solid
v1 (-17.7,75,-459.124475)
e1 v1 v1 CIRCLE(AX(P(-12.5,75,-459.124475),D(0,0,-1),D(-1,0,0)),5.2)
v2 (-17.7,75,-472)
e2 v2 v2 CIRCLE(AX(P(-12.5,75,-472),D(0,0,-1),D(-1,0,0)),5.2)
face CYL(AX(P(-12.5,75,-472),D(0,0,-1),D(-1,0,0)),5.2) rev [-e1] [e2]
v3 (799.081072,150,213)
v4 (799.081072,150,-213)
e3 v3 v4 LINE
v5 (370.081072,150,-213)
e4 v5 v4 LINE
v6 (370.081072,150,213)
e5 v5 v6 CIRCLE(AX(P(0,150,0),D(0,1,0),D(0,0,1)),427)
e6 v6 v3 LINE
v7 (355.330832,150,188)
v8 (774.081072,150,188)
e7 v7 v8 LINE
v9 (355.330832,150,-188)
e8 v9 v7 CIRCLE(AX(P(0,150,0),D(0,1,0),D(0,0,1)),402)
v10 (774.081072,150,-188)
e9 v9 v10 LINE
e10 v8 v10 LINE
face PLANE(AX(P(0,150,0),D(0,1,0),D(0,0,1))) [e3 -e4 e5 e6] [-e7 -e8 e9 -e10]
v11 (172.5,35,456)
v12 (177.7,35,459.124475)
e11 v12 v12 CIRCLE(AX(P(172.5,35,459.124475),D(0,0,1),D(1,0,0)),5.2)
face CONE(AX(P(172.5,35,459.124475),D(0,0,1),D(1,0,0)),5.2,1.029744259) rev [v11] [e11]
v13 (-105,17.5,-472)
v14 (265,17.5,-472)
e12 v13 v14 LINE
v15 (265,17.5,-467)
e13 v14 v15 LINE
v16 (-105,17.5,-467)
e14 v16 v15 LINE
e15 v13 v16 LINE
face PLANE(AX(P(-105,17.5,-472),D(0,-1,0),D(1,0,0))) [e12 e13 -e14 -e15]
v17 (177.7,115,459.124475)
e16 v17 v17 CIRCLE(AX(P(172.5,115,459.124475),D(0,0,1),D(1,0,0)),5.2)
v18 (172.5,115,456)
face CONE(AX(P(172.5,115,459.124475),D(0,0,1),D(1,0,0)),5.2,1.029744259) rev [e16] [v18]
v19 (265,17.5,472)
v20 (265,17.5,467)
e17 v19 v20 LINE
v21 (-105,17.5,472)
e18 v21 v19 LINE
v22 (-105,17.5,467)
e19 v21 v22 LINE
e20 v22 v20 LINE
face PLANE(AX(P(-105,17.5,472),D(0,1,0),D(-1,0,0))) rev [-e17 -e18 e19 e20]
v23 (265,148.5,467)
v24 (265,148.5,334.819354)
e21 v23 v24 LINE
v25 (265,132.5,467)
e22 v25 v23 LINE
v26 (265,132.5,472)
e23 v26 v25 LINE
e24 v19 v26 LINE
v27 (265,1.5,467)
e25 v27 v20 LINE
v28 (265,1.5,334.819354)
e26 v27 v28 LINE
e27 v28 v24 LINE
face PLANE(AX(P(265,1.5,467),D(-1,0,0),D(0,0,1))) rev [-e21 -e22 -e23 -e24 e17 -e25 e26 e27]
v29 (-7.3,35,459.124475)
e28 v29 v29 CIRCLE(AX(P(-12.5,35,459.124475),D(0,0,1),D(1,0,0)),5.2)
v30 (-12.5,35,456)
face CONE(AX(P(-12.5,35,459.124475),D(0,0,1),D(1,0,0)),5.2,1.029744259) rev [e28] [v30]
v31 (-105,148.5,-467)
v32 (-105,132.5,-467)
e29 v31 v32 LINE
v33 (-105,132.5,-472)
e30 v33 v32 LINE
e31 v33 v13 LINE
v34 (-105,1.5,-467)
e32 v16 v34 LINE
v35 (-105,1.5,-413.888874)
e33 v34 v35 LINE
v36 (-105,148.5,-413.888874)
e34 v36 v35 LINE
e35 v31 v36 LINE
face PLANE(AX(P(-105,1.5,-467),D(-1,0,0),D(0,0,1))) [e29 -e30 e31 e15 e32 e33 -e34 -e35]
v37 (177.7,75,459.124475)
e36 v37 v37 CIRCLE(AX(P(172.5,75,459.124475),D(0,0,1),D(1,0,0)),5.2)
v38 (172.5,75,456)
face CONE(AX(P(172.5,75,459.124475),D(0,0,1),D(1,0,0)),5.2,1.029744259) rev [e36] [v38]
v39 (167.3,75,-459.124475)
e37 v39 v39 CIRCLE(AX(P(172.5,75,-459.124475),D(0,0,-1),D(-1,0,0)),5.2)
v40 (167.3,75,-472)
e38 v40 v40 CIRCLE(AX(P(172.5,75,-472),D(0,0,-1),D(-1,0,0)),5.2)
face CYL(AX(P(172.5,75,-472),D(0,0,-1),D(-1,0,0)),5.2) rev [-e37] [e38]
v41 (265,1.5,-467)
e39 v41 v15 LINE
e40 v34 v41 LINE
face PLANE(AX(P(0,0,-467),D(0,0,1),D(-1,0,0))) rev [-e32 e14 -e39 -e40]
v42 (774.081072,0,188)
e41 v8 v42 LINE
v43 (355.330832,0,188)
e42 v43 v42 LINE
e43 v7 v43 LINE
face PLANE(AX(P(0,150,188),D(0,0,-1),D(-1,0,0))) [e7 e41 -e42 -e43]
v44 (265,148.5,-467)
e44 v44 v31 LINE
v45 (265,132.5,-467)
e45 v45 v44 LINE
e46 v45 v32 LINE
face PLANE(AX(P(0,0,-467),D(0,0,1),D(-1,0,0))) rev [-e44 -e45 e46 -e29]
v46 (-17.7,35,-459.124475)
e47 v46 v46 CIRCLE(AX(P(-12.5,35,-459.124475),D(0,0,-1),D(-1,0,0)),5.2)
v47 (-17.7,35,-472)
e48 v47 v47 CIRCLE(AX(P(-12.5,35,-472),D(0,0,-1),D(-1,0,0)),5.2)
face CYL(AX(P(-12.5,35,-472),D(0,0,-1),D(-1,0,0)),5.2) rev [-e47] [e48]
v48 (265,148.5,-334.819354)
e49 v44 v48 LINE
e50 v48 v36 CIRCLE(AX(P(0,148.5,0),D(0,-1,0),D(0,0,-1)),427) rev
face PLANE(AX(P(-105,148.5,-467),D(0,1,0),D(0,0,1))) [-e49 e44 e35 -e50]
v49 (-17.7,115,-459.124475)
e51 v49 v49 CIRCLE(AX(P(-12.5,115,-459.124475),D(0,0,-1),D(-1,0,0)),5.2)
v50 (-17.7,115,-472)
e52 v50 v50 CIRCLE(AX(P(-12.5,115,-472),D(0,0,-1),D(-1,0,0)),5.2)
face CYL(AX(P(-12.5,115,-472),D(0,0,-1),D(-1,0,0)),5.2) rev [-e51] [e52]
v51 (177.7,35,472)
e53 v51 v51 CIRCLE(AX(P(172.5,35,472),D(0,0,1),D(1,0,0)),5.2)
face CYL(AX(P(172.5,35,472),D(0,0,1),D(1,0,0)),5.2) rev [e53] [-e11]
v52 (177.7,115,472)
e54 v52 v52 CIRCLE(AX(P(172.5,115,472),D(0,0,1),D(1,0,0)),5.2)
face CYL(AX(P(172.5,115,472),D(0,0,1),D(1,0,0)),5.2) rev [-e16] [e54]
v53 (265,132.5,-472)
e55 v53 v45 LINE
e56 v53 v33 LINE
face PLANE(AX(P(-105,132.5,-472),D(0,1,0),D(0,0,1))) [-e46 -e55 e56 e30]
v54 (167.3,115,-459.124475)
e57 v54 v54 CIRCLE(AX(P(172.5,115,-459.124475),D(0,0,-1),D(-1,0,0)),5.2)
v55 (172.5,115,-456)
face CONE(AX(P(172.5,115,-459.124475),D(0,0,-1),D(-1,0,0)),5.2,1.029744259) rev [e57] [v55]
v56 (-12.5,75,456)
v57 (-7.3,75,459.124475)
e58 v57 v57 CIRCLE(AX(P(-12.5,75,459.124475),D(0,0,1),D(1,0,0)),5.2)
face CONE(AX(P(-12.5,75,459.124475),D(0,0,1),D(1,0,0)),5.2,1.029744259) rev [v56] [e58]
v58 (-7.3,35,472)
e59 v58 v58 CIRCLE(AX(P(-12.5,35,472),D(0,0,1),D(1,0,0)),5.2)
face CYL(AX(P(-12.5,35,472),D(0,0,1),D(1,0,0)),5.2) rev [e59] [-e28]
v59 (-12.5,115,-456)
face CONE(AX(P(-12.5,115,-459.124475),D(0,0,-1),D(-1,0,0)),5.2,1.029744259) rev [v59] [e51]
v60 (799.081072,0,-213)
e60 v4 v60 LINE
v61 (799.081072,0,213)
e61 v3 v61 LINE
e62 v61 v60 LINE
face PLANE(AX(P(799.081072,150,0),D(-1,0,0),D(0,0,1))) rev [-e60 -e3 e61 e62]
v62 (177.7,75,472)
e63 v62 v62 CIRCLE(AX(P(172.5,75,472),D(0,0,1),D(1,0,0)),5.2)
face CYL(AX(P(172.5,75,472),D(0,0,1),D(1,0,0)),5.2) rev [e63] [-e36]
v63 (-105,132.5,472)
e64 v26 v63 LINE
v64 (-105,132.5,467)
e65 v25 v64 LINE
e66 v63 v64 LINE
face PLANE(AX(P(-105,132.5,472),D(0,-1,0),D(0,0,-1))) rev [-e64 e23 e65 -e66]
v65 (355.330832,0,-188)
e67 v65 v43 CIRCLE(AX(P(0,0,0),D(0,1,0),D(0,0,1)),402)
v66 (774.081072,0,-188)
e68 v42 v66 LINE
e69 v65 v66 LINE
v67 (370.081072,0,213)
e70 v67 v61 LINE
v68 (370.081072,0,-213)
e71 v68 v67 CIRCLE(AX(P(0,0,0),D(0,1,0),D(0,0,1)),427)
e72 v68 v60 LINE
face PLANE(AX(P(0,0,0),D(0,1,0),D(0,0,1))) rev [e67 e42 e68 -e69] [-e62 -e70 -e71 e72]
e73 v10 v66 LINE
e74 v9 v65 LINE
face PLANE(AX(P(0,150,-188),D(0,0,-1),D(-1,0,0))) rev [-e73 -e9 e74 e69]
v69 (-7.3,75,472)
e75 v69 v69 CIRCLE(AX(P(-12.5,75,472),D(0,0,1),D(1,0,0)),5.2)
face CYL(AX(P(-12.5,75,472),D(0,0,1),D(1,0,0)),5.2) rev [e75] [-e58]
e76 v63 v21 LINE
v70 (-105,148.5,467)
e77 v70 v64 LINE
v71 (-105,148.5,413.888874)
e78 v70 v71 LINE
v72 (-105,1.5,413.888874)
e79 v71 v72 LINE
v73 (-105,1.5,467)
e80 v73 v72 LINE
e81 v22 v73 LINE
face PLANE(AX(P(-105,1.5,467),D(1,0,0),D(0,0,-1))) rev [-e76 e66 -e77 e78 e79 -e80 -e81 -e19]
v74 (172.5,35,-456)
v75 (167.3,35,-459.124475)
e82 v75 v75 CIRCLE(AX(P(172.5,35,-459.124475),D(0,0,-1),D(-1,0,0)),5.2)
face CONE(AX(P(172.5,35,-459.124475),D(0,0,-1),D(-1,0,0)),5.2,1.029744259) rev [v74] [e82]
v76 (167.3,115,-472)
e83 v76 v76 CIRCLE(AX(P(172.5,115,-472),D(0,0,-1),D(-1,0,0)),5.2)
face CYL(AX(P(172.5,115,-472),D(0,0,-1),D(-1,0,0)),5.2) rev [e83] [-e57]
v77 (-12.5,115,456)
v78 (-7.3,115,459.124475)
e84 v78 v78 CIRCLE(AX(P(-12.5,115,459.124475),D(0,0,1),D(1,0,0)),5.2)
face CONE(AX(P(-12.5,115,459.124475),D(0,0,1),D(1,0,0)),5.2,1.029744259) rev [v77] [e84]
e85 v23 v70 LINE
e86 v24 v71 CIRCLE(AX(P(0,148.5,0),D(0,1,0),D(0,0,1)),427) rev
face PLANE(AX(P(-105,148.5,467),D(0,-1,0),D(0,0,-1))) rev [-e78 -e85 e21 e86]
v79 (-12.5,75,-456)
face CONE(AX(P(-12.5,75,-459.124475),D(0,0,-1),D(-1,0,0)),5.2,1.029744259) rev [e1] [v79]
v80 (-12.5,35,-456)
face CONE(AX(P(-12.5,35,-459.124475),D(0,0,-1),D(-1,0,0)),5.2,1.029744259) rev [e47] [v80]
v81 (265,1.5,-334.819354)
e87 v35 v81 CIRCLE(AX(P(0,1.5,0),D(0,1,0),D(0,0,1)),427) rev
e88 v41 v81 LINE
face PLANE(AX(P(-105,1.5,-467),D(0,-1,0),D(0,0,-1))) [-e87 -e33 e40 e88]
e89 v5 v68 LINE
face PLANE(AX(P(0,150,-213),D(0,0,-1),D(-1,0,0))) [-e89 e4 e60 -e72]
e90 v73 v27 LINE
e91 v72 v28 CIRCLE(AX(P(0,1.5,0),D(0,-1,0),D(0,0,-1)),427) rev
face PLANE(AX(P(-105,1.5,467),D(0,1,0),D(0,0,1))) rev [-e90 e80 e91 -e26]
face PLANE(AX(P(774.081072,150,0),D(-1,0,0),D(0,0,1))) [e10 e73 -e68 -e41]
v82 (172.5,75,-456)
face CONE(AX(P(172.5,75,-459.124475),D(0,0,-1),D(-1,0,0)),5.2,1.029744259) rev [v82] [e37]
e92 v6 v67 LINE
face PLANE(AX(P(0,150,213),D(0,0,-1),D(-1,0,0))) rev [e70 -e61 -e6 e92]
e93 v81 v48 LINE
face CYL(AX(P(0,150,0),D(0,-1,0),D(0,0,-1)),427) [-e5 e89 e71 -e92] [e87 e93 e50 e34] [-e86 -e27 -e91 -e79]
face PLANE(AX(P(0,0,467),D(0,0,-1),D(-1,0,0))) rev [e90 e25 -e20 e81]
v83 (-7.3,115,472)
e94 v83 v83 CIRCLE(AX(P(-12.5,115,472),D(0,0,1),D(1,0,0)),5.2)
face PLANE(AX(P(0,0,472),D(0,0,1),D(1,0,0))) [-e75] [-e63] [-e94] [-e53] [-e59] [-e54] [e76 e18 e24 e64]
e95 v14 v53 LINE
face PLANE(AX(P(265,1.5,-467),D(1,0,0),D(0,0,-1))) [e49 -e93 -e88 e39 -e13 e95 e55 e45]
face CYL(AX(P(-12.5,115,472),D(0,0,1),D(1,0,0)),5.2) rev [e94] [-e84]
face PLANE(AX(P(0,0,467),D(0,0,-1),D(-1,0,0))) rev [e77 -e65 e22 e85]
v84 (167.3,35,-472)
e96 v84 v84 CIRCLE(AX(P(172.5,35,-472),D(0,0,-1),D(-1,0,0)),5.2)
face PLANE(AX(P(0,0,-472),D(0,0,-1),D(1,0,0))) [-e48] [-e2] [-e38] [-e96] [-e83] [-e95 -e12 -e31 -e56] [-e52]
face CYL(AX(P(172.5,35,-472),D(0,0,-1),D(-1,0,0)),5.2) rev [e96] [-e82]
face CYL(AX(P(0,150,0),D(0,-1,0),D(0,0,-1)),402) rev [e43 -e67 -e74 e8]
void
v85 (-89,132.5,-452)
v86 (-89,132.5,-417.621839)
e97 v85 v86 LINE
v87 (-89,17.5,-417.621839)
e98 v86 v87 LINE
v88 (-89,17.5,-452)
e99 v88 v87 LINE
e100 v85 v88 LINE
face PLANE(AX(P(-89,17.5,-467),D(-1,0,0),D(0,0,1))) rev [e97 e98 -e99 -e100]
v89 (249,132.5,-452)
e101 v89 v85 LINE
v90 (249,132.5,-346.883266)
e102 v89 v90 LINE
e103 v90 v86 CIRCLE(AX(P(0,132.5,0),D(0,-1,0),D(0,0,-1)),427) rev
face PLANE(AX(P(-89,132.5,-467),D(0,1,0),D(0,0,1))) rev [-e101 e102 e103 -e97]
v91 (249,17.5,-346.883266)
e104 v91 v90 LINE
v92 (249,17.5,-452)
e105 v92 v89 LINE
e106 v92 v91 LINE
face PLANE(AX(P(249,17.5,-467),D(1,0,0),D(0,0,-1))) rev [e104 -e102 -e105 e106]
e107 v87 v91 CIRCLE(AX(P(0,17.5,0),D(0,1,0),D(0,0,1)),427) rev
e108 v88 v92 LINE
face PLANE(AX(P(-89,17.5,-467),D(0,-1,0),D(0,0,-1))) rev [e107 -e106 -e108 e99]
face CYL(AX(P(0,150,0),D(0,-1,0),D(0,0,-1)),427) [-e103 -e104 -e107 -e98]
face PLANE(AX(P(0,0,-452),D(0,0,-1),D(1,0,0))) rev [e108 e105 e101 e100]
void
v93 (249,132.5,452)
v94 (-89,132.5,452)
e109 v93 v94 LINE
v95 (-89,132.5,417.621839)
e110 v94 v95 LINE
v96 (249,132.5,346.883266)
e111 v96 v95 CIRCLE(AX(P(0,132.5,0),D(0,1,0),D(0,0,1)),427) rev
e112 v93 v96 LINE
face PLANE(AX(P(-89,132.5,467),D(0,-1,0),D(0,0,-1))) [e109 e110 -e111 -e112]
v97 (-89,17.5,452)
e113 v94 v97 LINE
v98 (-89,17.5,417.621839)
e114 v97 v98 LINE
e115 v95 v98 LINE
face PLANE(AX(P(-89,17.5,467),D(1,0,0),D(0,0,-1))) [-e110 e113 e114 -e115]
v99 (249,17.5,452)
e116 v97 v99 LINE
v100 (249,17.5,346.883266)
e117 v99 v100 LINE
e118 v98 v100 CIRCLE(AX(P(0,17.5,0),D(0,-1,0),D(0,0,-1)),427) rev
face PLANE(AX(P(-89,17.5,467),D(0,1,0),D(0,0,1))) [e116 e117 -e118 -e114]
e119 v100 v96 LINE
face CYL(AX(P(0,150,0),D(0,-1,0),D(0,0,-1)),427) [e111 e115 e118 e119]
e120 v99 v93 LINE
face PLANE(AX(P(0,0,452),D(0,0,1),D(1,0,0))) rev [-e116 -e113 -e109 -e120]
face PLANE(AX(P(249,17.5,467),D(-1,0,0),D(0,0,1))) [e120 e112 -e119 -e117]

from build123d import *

# Parameters (mm, degrees)
BOSS_EXTRUDE1_DEPTH               = 150
BOSS_EXTRUDE2_START               = 1.5
BOSS_EXTRUDE2_DEPTH               = 147
BOSS_EXTRUDE2_2_DEPTH             = 16
BOSS_EXTRUDE2_START_2             = 132.5
BOSS_EXTRUDE2_3_DEPTH             = 16
BOSS_EXTRUDE3_START               = -15
SKETCH3_W                         = 370
SKETCH3_H                         = 115
BOSS_EXTRUDE3_DEPTH               = 20
TAP_DRILL_FOR_M12_TAP1_AT_2_COUNT = 2
TAP_DRILL_FOR_M12_TAP1_AT_2_PITCH = 80
TAP_DRILL_FOR_M12_TAP1_AT_3_COUNT = 2
TAP_DRILL_FOR_M12_TAP1_AT_3_PITCH = 185
TAP_DRILL_FOR_M12_TAP1_AT_4_COUNT = 2
TAP_DRILL_FOR_M12_TAP1_AT_4_PITCH = 201.556443707
TAP_DRILL_FOR_M12_TAP1_AT_5_COUNT = 2
TAP_DRILL_FOR_M12_TAP1_AT_5_PITCH = 189.274932307
TAP_DRILL_FOR_M12_TAP1_AT_6_COUNT = 2
TAP_DRILL_FOR_M12_TAP1_AT_6_PITCH = 40


# Read off the part's stored shape, not the designer's step: Boss-Extrude2
with BuildPart() as part:
    # Sketch1 → Boss-Extrude1 (new body)
    with BuildSketch(Plane(origin=(0, 0, 0), x_dir=(1, 0, 0), z_dir=(0, 1, 0))):
        with BuildLine():
            Line((799.081072199, 213), (370.081072199, 213))
            ThreePointArc((370.081072199, 213), (-427, 0), (370.081072199, -213))
            Line((370.081072199, -213), (799.081072199, -213))
            Line((799.081072199, -213), (799.081072199, 213))
        make_face()
        with BuildLine():
            Line((355.330831761, 188), (774.081072199, 188))
            Line((774.081072199, 188), (774.081072199, -188))
            Line((774.081072199, -188), (355.330831761, -188))
            ThreePointArc((355.330831761, -188), (-402, 0), (355.330831761, 188))
        make_face(mode=Mode.SUBTRACT)
    extrude(amount=BOSS_EXTRUDE1_DEPTH)

    # Boss-Extrude2 outline → Boss-Extrude2 (add)
    with BuildSketch(Plane(origin=(0, 0, 0), x_dir=(1, 0, 0), z_dir=(0, 1, 0)).offset(BOSS_EXTRUDE2_START)):
        with BuildLine():
            Line((249, -467), (265, -467))
            Line((265, -467), (265, -334.819354279))
            ThreePointArc((265, -334.819354279), (257.070777199, -340.945179626), (249, -346.883265667))
            Line((249, -346.883265667), (249, -467))
        make_face()
        with BuildLine():
            Line((-105, -467), (-89, -467))
            Line((-89, -467), (-89, -417.621838509))
            ThreePointArc((-89, -417.621838509), (-97.017955844, -415.83231746), (-105, -413.888873975))
            Line((-105, -413.888873975), (-105, -467))
        make_face()
    boss_extrude2 = extrude(amount=BOSS_EXTRUDE2_DEPTH)

    # Boss-Extrude2 2 outline → Boss-Extrude2 2 (add)
    with BuildSketch(Plane(origin=(0, 0, 0), x_dir=(1, 0, 0), z_dir=(0, 1, 0)).offset(BOSS_EXTRUDE2_START)):
        with BuildLine():
            Line((-89, -467), (249, -467))
            Line((249, -467), (249, -346.883265667))
            ThreePointArc((249, -346.883265667), (87.46991724, -417.944988698), (-89, -417.621838509))
            Line((-89, -417.621838509), (-89, -467))
        make_face()
    boss_extrude2_2 = extrude(amount=BOSS_EXTRUDE2_2_DEPTH)

    # Boss-Extrude2 3 outline → Boss-Extrude2 3 (add)
    with BuildSketch(Plane(origin=(0, 0, 0), x_dir=(1, 0, 0), z_dir=(0, 1, 0)).offset(BOSS_EXTRUDE2_START_2)):
        with BuildLine():
            Line((-89, -467), (249, -467))
            Line((249, -467), (249, -346.883265667))
            ThreePointArc((249, -346.883265667), (87.46991724, -417.944988698), (-89, -417.621838509))
            Line((-89, -417.621838509), (-89, -467))
        make_face()
    boss_extrude2_3 = extrude(amount=BOSS_EXTRUDE2_3_DEPTH)

    # Sketch3 → Boss-Extrude3 (add)
    with BuildSketch(Plane.XY.offset(467).offset(BOSS_EXTRUDE3_START)):
        with Locations((80, 75)):
            Rectangle(SKETCH3_W, SKETCH3_H)
    boss_extrude3 = extrude(amount=BOSS_EXTRUDE3_DEPTH)

    # Sketch7 → Tap Drill for M12 Tap1 (revolve, cut)
    with BuildSketch(Plane(origin=(172.5, 115, 472), x_dir=(0, -1, 0), z_dir=(1, 0, 0))):
        Polygon((0, 0), (0, 16), (5.2, 12.875524781), (5.2, 0), align=None)
    tap_drill_for_m12_tap1 = revolve(axis=Axis((172.5, 115, 478.35), (0, 0, -1)), mode=Mode.SUBTRACT)

    # Tap Drill for M12 Tap1 at 2: Tap Drill for M12 Tap1 ×2
    with Locations(*[(0, -i * TAP_DRILL_FOR_M12_TAP1_AT_2_PITCH, 0) for i in range(1, TAP_DRILL_FOR_M12_TAP1_AT_2_COUNT)]):
        add(tap_drill_for_m12_tap1, mode=Mode.SUBTRACT)

    # Tap Drill for M12 Tap1 at 3: Tap Drill for M12 Tap1 ×2
    with Locations(*[(-i * TAP_DRILL_FOR_M12_TAP1_AT_3_PITCH, 0, 0) for i in range(1, TAP_DRILL_FOR_M12_TAP1_AT_3_COUNT)]):
        add(tap_drill_for_m12_tap1, mode=Mode.SUBTRACT)

    # Tap Drill for M12 Tap1 at 4: Tap Drill for M12 Tap1 ×2
    with Locations(*[Vector(-0.9178570359601427, -0.3969111506854671, 0) * (i * TAP_DRILL_FOR_M12_TAP1_AT_4_PITCH) for i in range(1, TAP_DRILL_FOR_M12_TAP1_AT_4_COUNT)]):
        add(tap_drill_for_m12_tap1, mode=Mode.SUBTRACT)

    # Tap Drill for M12 Tap1 at 5: Tap Drill for M12 Tap1 ×2
    with Locations(*[Vector(-0.9774141654398674, -0.21133279252753864, 0) * (i * TAP_DRILL_FOR_M12_TAP1_AT_5_PITCH) for i in range(1, TAP_DRILL_FOR_M12_TAP1_AT_5_COUNT)]):
        add(tap_drill_for_m12_tap1, mode=Mode.SUBTRACT)

    # Tap Drill for M12 Tap1 at 6: Tap Drill for M12 Tap1 ×2
    with Locations(*[(0, -i * TAP_DRILL_FOR_M12_TAP1_AT_6_PITCH, 0) for i in range(1, TAP_DRILL_FOR_M12_TAP1_AT_6_COUNT)]):
        add(tap_drill_for_m12_tap1, mode=Mode.SUBTRACT)

    # Mirror1: Boss-Extrude2, Boss-Extrude2 2, Boss-Extrude2 3, Boss-Extrude3, Tap Drill for M12 Tap1 across plane
    add(boss_extrude2.mirror(Plane.XY))
    add(boss_extrude2_2.mirror(Plane.XY))
    add(boss_extrude2_3.mirror(Plane.XY))
    add(boss_extrude3.mirror(Plane.XY))
    add(tap_drill_for_m12_tap1.mirror(Plane.XY), mode=Mode.SUBTRACT)

    # Mirror1 copy 1 sketch → Mirror1 copy 1 (revolve, cut)
    with BuildSketch(Plane(origin=(172.5, 35, -472), x_dir=(0, -1, 0), z_dir=(1, 0, 0))):
        Polygon((0, 0), (0, -16), (5.2, -12.875524781), (5.2, 0), align=None)
    revolve(axis=Axis((172.5, 35, -478.35), (0, 0, -1)), mode=Mode.SUBTRACT)

    # Mirror1 copy 2 sketch → Mirror1 copy 2 (revolve, cut)
    with BuildSketch(Plane(origin=(-12.5, 115, -472), x_dir=(0, -1, 0), z_dir=(1, 0, 0))):
        Polygon((0, 0), (0, -16), (5.2, -12.875524781), (5.2, 0), align=None)
    revolve(axis=Axis((-12.5, 115, -478.35), (0, 0, -1)), mode=Mode.SUBTRACT)

    # Mirror1 copy 3 sketch → Mirror1 copy 3 (revolve, cut)
    with BuildSketch(Plane(origin=(-12.5, 35, -472), x_dir=(0, -1, 0), z_dir=(1, 0, 0))):
        Polygon((0, 0), (0, -16), (5.2, -12.875524781), (5.2, 0), align=None)
    revolve(axis=Axis((-12.5, 35, -478.35), (0, 0, -1)), mode=Mode.SUBTRACT)

    # Mirror1 copy 4 sketch → Mirror1 copy 4 (revolve, cut)
    with BuildSketch(Plane(origin=(-12.5, 75, -472), x_dir=(0, -1, 0), z_dir=(1, 0, 0))):
        Polygon((0, 0), (0, -16), (5.2, -12.875524781), (5.2, 0), align=None)
    revolve(axis=Axis((-12.5, 75, -478.35), (0, 0, -1)), mode=Mode.SUBTRACT)

    # Mirror1 copy 5 sketch → Mirror1 copy 5 (revolve, cut)
    with BuildSketch(Plane(origin=(172.5, 75, -472), x_dir=(0, -1, 0), z_dir=(1, 0, 0))):
        Polygon((0, 0), (0, -16), (5.2, -12.875524781), (5.2, 0), align=None)
    revolve(axis=Axis((172.5, 75, -478.35), (0, 0, -1)), mode=Mode.SUBTRACT)


solid = part.part
